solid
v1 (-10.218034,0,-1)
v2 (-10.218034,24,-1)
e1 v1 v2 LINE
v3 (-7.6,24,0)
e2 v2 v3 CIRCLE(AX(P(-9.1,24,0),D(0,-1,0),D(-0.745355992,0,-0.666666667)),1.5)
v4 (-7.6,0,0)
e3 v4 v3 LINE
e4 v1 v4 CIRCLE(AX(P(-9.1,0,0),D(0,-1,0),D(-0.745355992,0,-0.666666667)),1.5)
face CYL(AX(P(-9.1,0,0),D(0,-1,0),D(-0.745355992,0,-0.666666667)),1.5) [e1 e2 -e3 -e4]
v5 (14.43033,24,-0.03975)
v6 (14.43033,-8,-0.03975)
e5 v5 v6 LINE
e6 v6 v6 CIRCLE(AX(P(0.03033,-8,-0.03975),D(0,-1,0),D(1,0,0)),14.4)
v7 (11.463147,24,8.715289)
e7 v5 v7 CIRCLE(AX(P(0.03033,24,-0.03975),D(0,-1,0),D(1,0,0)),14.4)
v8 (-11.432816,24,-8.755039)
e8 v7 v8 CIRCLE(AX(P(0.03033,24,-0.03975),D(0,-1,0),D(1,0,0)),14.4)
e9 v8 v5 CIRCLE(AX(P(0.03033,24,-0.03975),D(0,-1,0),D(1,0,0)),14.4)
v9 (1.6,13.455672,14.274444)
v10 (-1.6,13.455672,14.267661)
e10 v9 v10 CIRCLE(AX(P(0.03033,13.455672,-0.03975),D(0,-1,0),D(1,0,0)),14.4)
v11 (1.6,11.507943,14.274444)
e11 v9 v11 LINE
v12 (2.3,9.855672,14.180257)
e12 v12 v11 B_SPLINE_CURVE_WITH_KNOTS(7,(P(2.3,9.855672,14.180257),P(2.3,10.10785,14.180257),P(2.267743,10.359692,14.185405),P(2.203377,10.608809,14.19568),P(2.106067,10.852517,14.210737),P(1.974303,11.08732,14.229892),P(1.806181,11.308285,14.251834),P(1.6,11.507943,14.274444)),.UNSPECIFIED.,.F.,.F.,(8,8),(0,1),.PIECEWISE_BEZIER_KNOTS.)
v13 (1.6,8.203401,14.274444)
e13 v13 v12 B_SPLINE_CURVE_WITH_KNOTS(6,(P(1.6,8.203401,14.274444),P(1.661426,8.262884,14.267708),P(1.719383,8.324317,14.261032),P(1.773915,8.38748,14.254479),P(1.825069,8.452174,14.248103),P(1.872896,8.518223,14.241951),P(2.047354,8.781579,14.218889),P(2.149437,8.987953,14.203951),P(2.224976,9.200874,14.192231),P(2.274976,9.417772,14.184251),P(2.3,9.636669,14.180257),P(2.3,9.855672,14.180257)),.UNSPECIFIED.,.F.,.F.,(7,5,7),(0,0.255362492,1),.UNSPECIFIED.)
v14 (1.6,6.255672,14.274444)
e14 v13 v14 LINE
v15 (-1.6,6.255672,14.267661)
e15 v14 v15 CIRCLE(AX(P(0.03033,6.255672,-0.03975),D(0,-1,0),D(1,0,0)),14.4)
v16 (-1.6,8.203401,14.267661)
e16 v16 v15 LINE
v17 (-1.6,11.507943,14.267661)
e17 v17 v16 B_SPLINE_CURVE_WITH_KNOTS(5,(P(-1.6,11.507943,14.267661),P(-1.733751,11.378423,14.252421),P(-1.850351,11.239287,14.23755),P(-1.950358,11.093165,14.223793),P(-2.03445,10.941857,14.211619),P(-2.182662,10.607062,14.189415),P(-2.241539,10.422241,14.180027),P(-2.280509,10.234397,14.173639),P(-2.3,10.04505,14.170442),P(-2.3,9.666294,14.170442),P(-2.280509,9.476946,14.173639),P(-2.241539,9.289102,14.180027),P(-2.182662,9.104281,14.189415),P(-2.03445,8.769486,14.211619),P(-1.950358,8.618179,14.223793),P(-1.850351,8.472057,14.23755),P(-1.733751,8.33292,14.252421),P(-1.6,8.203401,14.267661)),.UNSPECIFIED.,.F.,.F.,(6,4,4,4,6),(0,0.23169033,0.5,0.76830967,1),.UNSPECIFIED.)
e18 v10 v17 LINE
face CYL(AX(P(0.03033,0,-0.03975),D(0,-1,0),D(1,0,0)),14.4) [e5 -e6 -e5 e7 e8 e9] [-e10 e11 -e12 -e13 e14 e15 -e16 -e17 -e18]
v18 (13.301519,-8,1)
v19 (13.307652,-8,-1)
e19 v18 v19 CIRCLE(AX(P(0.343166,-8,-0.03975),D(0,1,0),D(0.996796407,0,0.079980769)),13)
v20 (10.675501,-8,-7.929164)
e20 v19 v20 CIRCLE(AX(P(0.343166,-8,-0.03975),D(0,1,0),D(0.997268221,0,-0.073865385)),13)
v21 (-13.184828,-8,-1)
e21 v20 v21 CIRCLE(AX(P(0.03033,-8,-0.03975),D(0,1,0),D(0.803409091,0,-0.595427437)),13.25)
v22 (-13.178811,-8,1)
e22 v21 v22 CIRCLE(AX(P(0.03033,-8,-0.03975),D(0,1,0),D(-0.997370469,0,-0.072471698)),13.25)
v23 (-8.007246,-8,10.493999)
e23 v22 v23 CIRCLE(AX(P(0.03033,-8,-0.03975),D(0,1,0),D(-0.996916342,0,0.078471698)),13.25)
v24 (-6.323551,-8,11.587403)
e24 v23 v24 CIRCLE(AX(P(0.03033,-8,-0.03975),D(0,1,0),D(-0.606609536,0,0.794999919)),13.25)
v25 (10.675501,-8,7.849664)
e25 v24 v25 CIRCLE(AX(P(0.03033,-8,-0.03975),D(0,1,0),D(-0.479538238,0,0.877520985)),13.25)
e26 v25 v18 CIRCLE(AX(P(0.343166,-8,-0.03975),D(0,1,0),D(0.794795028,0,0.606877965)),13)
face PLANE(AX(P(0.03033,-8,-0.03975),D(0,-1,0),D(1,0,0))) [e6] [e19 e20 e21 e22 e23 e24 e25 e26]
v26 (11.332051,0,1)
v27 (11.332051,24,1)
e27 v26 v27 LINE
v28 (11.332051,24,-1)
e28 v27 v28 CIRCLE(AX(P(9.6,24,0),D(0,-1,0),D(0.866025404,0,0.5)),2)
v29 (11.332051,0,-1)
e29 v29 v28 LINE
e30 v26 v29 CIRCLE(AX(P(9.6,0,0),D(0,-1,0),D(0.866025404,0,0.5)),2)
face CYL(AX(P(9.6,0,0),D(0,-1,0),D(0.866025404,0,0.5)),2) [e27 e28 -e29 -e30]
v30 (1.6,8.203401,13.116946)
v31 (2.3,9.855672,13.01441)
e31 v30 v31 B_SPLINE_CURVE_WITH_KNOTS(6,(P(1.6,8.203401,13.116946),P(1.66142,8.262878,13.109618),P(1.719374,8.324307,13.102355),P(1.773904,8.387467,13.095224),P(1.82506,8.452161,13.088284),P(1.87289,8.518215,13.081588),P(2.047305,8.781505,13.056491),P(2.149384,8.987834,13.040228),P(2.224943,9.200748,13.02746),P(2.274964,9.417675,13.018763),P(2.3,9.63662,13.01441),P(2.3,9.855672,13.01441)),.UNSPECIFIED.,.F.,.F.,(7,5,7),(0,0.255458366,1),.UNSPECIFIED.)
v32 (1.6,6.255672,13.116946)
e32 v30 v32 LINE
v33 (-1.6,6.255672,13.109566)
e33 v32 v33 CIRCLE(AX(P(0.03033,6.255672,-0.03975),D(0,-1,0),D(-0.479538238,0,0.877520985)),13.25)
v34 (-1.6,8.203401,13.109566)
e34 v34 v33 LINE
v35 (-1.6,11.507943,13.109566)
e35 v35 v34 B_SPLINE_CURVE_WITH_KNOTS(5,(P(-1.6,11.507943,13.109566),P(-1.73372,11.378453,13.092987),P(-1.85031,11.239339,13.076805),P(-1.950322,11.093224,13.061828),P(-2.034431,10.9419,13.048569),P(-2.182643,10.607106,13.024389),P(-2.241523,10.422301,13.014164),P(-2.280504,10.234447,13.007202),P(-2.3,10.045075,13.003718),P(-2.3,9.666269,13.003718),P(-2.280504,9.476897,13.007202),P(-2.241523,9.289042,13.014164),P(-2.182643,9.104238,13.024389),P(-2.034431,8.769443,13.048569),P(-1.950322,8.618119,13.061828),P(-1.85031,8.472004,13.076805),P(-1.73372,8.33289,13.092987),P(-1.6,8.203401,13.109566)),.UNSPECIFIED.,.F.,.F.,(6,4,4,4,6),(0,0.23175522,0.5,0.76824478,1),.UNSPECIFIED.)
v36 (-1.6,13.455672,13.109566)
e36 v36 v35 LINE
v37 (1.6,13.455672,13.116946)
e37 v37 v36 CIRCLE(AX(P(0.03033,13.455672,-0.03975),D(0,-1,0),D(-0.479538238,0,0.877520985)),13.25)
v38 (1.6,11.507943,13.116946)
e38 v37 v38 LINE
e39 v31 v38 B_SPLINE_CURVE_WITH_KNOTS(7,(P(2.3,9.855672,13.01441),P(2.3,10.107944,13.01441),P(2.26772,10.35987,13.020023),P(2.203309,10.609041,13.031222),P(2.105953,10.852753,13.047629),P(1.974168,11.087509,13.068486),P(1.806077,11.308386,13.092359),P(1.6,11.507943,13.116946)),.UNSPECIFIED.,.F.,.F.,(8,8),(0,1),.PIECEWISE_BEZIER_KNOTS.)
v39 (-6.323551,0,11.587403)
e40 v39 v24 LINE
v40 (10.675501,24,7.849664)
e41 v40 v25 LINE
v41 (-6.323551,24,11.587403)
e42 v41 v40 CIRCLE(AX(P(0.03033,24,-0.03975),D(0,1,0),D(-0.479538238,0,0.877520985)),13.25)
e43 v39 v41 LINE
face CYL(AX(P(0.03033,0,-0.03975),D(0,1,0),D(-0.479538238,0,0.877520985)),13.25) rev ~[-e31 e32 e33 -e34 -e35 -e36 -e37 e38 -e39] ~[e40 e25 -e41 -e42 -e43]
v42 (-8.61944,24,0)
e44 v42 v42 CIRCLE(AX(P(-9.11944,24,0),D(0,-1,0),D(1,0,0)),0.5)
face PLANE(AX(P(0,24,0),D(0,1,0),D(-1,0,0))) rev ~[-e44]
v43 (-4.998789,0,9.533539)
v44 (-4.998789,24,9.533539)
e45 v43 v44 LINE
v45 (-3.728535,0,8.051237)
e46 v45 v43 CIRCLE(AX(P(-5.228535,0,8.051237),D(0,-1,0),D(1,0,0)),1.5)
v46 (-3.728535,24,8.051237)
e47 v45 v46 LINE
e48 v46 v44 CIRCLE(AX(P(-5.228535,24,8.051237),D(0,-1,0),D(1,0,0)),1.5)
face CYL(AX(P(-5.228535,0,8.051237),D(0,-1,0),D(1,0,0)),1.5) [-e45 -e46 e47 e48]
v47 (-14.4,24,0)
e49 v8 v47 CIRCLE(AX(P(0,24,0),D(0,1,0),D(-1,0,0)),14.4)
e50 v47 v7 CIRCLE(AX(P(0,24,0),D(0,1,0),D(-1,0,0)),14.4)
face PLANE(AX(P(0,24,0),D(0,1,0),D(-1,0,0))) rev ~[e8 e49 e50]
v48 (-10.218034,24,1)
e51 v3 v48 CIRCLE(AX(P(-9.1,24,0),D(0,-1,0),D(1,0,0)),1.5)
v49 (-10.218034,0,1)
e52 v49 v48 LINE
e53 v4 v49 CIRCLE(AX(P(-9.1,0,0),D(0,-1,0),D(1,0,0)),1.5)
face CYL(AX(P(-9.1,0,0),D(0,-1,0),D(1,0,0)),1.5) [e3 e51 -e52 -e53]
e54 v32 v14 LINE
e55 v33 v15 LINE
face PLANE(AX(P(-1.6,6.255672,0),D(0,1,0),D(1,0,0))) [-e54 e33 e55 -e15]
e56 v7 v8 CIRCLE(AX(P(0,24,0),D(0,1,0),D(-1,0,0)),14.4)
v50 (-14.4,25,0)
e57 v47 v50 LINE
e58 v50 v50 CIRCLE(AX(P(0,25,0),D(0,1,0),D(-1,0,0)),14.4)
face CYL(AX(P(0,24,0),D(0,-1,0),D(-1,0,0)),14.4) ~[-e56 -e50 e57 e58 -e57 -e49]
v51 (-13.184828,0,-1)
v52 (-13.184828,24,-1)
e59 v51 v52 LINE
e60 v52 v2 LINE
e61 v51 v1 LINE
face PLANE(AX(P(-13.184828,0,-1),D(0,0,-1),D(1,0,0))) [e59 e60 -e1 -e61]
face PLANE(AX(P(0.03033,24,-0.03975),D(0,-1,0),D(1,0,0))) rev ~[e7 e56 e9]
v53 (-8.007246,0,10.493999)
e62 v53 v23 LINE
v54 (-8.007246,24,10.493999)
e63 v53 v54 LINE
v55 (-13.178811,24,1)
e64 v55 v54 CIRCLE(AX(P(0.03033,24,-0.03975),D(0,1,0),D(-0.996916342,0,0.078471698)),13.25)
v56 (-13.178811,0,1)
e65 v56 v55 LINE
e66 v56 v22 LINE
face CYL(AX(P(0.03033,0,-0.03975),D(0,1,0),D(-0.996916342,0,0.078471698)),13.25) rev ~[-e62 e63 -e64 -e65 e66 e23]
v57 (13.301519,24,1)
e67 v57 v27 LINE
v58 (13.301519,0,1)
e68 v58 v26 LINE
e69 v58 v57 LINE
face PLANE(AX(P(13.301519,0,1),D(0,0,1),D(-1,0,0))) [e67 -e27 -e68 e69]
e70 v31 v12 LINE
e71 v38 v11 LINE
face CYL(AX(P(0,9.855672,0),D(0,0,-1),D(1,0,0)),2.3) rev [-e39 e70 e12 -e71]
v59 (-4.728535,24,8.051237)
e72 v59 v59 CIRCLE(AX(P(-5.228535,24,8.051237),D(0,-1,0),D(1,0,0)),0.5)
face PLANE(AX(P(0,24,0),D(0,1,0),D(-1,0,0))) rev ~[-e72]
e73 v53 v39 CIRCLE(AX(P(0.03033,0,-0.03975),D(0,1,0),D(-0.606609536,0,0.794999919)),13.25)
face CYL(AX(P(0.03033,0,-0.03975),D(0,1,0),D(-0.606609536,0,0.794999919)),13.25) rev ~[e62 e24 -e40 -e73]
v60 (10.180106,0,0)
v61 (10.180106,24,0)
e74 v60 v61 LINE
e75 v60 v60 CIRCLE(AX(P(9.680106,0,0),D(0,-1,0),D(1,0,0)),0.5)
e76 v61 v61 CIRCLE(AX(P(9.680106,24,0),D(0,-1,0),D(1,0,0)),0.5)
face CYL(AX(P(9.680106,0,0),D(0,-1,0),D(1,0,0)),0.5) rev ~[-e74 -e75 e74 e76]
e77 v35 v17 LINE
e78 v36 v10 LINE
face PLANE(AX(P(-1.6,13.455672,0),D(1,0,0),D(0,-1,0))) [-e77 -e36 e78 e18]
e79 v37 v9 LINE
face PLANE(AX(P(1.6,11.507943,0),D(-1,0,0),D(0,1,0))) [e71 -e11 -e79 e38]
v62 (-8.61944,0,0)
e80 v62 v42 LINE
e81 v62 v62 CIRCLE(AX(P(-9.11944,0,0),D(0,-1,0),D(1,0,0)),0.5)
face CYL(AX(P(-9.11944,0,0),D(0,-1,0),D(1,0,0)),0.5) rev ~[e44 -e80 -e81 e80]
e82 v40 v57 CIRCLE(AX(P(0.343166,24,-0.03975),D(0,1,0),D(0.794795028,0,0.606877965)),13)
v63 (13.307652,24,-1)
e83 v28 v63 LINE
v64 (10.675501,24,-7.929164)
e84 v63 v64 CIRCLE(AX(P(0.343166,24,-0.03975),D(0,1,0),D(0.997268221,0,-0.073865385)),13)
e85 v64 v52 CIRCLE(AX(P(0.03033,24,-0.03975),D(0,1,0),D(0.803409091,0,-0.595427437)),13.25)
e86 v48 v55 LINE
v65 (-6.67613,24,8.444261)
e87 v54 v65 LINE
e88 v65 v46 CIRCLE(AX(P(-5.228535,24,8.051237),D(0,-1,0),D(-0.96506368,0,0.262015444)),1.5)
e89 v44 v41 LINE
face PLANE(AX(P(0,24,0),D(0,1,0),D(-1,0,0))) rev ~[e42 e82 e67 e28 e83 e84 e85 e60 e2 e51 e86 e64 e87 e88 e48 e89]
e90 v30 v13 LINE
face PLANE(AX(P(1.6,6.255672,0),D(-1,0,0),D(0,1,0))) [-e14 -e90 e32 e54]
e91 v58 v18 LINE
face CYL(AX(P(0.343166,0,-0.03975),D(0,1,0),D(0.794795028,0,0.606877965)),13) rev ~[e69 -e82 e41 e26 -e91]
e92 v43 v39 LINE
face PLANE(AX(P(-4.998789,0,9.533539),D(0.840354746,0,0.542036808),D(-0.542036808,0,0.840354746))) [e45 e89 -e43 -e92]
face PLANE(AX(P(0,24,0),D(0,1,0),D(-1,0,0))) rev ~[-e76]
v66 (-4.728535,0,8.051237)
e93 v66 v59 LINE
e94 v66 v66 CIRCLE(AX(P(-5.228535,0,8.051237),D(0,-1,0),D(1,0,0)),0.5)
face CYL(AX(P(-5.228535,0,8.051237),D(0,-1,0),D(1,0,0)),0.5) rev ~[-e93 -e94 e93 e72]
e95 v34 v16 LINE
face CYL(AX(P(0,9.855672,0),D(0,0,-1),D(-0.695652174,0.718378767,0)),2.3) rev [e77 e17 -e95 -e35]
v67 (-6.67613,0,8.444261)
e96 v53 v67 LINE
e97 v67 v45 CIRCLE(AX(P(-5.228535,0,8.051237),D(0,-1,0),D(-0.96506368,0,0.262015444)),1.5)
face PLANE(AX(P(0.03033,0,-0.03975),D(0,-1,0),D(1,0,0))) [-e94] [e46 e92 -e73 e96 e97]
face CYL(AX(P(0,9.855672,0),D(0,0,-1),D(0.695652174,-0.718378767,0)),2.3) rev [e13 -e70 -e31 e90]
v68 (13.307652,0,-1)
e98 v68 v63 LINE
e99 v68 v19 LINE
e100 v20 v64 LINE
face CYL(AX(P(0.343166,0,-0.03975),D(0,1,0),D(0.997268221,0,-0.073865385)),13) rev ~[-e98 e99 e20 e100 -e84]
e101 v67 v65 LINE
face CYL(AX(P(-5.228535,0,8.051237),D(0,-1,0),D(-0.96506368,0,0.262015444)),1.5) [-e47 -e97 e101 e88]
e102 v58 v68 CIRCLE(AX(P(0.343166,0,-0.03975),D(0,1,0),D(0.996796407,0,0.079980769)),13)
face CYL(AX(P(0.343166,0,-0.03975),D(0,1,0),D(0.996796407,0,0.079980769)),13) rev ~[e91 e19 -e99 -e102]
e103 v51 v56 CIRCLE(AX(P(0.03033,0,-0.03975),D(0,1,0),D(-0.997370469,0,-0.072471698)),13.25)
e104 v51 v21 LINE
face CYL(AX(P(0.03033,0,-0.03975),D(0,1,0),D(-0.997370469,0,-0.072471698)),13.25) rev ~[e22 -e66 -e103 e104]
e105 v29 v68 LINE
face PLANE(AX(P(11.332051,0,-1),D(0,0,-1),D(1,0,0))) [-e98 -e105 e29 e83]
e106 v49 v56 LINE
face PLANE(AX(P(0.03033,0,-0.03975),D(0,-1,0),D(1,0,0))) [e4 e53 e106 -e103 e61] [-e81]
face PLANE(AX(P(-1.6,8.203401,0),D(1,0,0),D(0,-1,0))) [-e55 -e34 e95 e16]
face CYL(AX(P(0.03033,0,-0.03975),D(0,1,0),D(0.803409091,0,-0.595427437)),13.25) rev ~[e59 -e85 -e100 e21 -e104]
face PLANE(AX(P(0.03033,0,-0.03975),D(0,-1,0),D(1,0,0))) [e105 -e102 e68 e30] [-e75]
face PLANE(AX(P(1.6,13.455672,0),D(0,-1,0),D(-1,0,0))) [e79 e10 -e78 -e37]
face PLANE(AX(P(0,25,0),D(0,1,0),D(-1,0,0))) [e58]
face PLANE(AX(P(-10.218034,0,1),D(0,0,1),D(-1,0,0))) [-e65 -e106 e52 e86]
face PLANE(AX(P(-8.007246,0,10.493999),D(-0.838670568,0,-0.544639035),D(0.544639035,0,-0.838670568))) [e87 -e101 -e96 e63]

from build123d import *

# Parameters (mm, degrees)
F0_R     = 14.4
F1_DEPTH = 8
F0_R_2   = 0.5
F2_DEPTH = 24
F4_DEPTH = 25
F5_R     = 14.4
F6_DEPTH = 1


# Not quite as in the source:
# - a feature names something its author has since deleted; it is built from what else it names


with BuildPart() as f1:
    # F0 (on Front) → F1 (new body)
    with BuildSketch(Plane.XZ):
        with Locations((0.0303304768, -0.0397499959)):
            Circle(F0_R)
        with BuildLine():
            ThreePointArc((10.6755009314, 7.8496635433), (12.4816793636, 4.6139026446), (13.301518859, 1))
            ThreePointArc((13.301518859, 1), (13.3431044371, 0.0001181292), (13.3076524455, -1))
            ThreePointArc((13.3076524455, -1), (12.4958940048, -4.6561546149), (10.6755009314, -7.9291635352))
            ThreePointArc((10.6755009314, -7.9291635352), (-3.6648740835, -12.7640559989), (-13.1848282407, -1))
            ThreePointArc((-13.1848282407, -1), (-13.2196095565, 0.0001136945), (-13.1788110527, 1))
            ThreePointArc((-13.1788110527, 1), (-11.605380035, 6.2984469785), (-8.0072458781, 10.4939989255))
            ThreePointArc((-8.0072458781, 10.4939989255), (-7.1861367371, 11.0726350293), (-6.3235511773, 11.5874030488))
            ThreePointArc((-6.3235511773, 11.5874030488), (2.8757590992, 12.9011168976), (10.6755009314, 7.8496635433))
        make_face(mode=Mode.SUBTRACT)
    extrude(amount=F1_DEPTH)

    # F0 (on Front) → F2 (join)
    with BuildSketch(Plane.XZ):
        with Locations((0.0303304768, -0.0397499959)):
            Circle(F0_R)
        with BuildLine():
            ThreePointArc((10.6755009314, 7.8496635433), (12.4816793636, 4.6139026446), (13.301518859, 1))
            ThreePointArc((13.301518859, 1), (13.3431044371, 0.0001181292), (13.3076524455, -1))
            ThreePointArc((13.3076524455, -1), (12.4958940048, -4.6561546149), (10.6755009314, -7.9291635352))
            ThreePointArc((10.6755009314, -7.9291635352), (-3.6648740835, -12.7640559989), (-13.1848282407, -1))
            ThreePointArc((-13.1848282407, -1), (-13.2196095565, 0.0001136945), (-13.1788110527, 1))
            ThreePointArc((-13.1788110527, 1), (-11.605380035, 6.2984469785), (-8.0072458781, 10.4939989255))
            ThreePointArc((-8.0072458781, 10.4939989255), (-7.1861367371, 11.0726350293), (-6.3235511773, 11.5874030488))
            ThreePointArc((-6.3235511773, 11.5874030488), (2.8757590992, 12.9011168976), (10.6755009314, 7.8496635433))
        make_face(mode=Mode.SUBTRACT)
        with BuildLine():
            ThreePointArc((11.3320508076, -1), (11.5318516526, -0.5176380902), (11.6, 0))
            ThreePointArc((11.6, 0), (11.5318516526, 0.5176380902), (11.3320508076, 1))
            ThreePointArc((11.3320508076, 1), (7.6, 0), (11.3320508076, -1))
        make_face()
        with Locations((9.6801056635, 0)):
            Circle(F0_R_2, mode=Mode.SUBTRACT)
        with BuildLine():
            ThreePointArc((-10.2180339887, 1), (-10.6, 0), (-10.2180339887, -1))
            ThreePointArc((-10.2180339887, -1), (-8.5647668653, -1.4012585384), (-7.6, 0))
            ThreePointArc((-7.6, 0), (-8.5647668653, 1.4012585384), (-10.2180339887, 1))
        make_face()
        with Locations((-9.119440236, 0)):
            Circle(F0_R_2, mode=Mode.SUBTRACT)
        with BuildLine():
            ThreePointArc((-3.7285347361, 8.0512374523), (-4.0895399111, 9.0272962561), (-4.9987891209, 9.5335386876))
            ThreePointArc((-4.9987891209, 9.5335386876), (-6.0454932887, 9.3092433042), (-6.6761302568, 8.4442606176))
            ThreePointArc((-6.6761302568, 8.4442606176), (-5.4267854851, 6.5643962904), (-3.7285347361, 8.0512374523))
        make_face()
        with Locations((-5.2285347361, 8.0512374523)):
            Circle(F0_R_2, mode=Mode.SUBTRACT)
        with BuildLine():
            ThreePointArc((-13.1788110527, 1), (-13.2196095565, 0.0001136945), (-13.1848282407, -1))
            Line((-13.1848282407, -1), (-10.8320508076, -1))
            Line((-10.8320508076, -1), (-10.2180339887, -1))
            ThreePointArc((-10.2180339887, -1), (-10.6, 0), (-10.2180339887, 1))
            Line((-10.2180339887, 1), (-10.8320508076, 1))
            Line((-10.8320508076, 1), (-13.1788110527, 1))
        make_face()
        with BuildLine():
            Line((-4.9987891209, 9.5335386876), (-6.3235511773, 11.5874030488))
            ThreePointArc((-6.3235511773, 11.5874030488), (-7.1861367371, 11.0726350293), (-8.0072458781, 10.4939989255))
            Line((-8.0072458781, 10.4939989255), (-6.6761302568, 8.4442606176))
            ThreePointArc((-6.6761302568, 8.4442606176), (-6.0454932887, 9.3092433042), (-4.9987891209, 9.5335386876))
        make_face()
        with BuildLine():
            ThreePointArc((11.3320508076, 1), (11.5318516526, 0.5176380902), (11.6, 0))
            ThreePointArc((11.6, 0), (11.5318516526, -0.5176380902), (11.3320508076, -1))
            Line((11.3320508076, -1), (13.25, -1))
            Line((13.25, -1), (13.3076524455, -1))
            ThreePointArc((13.3076524455, -1), (13.3431044371, 0.0001181292), (13.301518859, 1))
            Line((13.301518859, 1), (13.25, 1))
            Line((13.25, 1), (11.3320508076, 1))
        make_face()
    extrude(amount=-F2_DEPTH)

    # F3 (on Top) → F4 (cut)
    with BuildSketch(Plane.XY):
        with BuildLine():
            Line((1.6, 6.2556717858), (1.6, 8.2034006216))
            ThreePointArc((1.6, 8.2034006216), (0, 7.5556717858), (-1.6, 8.2034006216))
            Line((-1.6, 8.2034006216), (-1.6, 6.2556717858))
            Line((-1.6, 6.2556717858), (1.6, 6.2556717858))
        make_face()
        with BuildLine():
            ThreePointArc((1.6, 8.2034006216), (2.1177818585, 8.9584538635), (2.3, 9.8556717858))
            ThreePointArc((2.3, 9.8556717858), (2.1177818585, 10.752889708), (1.6, 11.50794295))
            ThreePointArc((1.6, 11.50794295), (0, 12.1556717858), (-1.6, 11.50794295))
            ThreePointArc((-1.6, 11.50794295), (-2.3, 9.8556717858), (-1.6, 8.2034006216))
            ThreePointArc((-1.6, 8.2034006216), (0, 7.5556717858), (1.6, 8.2034006216))
        make_face()
        with BuildLine():
            ThreePointArc((-1.6, 11.50794295), (0, 12.1556717858), (1.6, 11.50794295))
            Line((1.6, 11.50794295), (1.6, 13.4556717858))
            Line((1.6, 13.4556717858), (-1.6, 13.4556717858))
            Line((-1.6, 13.4556717858), (-1.6, 11.50794295))
        make_face()
    extrude(amount=F4_DEPTH, mode=Mode.SUBTRACT)

    # F5 (on face) → F6 (join)
    with BuildSketch(Plane(origin=(0, 24, 0), x_dir=(-1, 0, 0), z_dir=(0, 1, 0))):
        Circle(F5_R)
    extrude(amount=F6_DEPTH)


solid = f1.part
